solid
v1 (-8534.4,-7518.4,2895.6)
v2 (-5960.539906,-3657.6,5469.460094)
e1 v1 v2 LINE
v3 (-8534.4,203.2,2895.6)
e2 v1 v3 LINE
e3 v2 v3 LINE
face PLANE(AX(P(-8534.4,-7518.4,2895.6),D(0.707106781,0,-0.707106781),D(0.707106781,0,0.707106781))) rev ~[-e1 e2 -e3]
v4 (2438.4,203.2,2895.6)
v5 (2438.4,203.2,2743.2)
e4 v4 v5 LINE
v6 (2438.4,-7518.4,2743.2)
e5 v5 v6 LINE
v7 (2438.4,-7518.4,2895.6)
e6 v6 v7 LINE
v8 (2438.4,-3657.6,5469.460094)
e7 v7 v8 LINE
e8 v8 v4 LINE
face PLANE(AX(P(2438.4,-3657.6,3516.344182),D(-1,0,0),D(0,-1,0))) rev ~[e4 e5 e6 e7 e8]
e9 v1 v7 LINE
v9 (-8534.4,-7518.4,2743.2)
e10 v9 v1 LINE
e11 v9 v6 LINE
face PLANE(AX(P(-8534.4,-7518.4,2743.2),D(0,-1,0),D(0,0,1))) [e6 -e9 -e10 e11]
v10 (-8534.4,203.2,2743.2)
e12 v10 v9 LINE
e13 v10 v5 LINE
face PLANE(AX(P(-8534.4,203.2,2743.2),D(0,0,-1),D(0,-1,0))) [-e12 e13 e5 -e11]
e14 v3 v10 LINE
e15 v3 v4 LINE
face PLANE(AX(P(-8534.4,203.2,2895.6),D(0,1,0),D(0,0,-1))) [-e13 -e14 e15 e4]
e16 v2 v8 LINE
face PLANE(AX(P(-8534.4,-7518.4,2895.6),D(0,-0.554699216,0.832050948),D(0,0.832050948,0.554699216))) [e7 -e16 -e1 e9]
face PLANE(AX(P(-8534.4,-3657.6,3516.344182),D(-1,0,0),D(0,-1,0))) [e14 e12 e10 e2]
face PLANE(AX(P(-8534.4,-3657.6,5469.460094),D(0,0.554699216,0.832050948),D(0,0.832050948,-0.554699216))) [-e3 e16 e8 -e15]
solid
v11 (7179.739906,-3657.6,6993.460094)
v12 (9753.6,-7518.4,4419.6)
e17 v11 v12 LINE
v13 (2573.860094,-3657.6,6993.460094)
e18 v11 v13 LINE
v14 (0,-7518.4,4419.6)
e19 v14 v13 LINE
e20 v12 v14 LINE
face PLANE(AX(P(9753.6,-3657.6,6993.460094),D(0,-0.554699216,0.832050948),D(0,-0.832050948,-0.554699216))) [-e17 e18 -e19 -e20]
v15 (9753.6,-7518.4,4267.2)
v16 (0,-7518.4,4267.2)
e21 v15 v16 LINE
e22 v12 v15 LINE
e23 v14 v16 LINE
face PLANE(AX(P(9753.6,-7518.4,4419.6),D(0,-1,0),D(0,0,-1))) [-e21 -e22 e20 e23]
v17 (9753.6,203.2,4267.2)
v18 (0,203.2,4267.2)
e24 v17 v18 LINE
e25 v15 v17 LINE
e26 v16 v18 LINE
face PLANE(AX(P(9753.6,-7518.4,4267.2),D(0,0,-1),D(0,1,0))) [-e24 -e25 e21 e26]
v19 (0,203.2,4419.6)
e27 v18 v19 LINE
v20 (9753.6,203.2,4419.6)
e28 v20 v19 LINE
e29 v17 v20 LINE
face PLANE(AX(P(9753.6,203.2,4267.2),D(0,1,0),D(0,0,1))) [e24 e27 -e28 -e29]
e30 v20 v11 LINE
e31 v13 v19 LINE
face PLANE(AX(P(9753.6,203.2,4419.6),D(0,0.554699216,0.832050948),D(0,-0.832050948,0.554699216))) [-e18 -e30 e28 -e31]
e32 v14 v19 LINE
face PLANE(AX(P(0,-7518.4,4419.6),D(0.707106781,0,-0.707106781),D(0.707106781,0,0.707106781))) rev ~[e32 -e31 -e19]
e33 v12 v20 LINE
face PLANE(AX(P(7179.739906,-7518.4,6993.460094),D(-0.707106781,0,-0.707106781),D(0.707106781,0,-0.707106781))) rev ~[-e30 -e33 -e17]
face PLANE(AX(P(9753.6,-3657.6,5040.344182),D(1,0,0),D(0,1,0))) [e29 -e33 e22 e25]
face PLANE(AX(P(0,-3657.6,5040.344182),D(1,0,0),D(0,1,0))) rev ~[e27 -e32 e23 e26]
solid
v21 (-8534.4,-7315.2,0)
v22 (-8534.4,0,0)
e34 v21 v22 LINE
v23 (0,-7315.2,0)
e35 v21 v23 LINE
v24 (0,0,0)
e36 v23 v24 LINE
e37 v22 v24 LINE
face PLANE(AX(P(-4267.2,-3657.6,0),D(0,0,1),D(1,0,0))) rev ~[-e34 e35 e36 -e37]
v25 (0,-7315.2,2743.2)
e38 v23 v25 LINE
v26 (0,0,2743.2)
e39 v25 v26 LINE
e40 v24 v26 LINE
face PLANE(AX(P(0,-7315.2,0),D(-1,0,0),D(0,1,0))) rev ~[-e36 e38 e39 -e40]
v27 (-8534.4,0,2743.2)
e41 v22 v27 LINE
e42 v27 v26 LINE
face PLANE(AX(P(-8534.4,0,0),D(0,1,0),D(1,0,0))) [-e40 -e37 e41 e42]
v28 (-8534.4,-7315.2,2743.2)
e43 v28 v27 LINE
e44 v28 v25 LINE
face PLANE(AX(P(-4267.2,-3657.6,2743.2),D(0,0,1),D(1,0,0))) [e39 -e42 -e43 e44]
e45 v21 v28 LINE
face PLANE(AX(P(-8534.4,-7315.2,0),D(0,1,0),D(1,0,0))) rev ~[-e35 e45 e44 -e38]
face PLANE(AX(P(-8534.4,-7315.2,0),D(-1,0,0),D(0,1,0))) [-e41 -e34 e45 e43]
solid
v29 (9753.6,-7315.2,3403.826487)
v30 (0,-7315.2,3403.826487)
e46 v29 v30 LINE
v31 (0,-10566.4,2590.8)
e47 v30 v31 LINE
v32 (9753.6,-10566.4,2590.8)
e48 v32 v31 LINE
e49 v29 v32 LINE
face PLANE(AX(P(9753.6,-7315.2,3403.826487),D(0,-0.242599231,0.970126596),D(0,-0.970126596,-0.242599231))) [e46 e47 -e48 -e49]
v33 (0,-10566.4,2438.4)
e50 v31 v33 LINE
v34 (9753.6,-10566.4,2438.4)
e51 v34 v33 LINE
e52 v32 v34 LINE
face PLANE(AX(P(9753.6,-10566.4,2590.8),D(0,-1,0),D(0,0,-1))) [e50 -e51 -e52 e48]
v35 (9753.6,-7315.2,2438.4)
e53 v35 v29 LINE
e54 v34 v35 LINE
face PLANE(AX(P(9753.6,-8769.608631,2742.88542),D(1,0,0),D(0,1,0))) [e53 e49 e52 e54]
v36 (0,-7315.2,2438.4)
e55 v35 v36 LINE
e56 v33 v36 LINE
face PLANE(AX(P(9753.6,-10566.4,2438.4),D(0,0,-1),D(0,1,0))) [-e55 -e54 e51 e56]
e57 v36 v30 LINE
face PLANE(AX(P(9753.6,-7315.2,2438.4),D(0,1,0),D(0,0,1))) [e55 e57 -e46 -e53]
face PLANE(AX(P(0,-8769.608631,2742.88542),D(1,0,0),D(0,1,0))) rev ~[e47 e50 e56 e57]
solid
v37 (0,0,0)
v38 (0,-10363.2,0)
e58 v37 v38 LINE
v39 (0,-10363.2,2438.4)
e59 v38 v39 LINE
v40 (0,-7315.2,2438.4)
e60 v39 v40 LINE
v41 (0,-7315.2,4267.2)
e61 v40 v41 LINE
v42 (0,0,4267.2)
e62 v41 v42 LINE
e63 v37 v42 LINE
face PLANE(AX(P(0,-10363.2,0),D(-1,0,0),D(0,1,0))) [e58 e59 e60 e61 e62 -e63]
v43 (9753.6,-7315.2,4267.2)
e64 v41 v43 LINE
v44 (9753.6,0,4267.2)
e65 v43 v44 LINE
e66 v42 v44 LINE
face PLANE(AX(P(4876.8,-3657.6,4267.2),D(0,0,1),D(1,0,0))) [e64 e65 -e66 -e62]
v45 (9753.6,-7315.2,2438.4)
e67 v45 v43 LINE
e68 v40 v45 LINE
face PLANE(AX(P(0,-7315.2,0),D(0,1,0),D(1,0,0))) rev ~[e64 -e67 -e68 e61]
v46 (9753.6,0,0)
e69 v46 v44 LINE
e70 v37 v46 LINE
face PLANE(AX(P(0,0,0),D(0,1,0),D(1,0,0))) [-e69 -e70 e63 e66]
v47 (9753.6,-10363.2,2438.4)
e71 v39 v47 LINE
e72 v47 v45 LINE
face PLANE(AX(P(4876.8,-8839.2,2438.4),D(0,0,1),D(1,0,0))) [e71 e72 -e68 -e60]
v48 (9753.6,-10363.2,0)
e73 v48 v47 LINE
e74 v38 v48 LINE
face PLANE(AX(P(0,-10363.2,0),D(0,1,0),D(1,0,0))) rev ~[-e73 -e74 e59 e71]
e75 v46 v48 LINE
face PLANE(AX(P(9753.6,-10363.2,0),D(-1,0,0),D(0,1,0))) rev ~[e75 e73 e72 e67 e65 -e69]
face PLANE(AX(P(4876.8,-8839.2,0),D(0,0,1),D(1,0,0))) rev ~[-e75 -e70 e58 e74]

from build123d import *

# Parameters (mm, degrees)
F0_W      = 9753.6
F0_H      = 7315.2
F1_DEPTH  = 4267.2
F3_DEPTH  = 9753.6
F4_W      = 9753.6
F4_H      = 3048
F5_DEPTH  = 2438.4
F7_DEPTH  = 9753.6
F8_W      = 8534.4
F8_H      = 7315.2
F9_DEPTH  = 2743.2
F11_DEPTH = 10972.8
F13_DEPTH = 7721.601
F15_DEPTH = 7721.601


# Not quite as in the source:
# - a feature names something its author has since deleted; it is built from what else it names


with BuildPart() as f1:
    # F0 (on Top) → F1 (new body)
    with BuildSketch(Plane.XY):
        with Locations((4876.8, -3657.6)):
            Rectangle(F0_W, F0_H)
    extrude(amount=F1_DEPTH)

    # F4 (on Top) → F5 (join)
    with BuildSketch(Plane.XY):
        with Locations((4876.8, -8839.2)):
            Rectangle(F4_W, F4_H)
    extrude(amount=F5_DEPTH)


with BuildPart() as f3:
    # F2 (on face) → F3 (new body)
    with BuildSketch(Plane.YZ.offset(9753.6)):
        Polygon((-7518.4, 4419.6), (-7518.4, 4267.2), (-7315.2, 4267.2), (0, 4267.2), (203.2, 4267.2), (203.2, 4419.6), (-3657.6, 6993.4600942352), align=None)
    extrude(amount=-F3_DEPTH)

    # F14 (on face) → F15 (cut, through all)
    with BuildSketch(Plane.XZ.offset(7518.4)):
        Polygon((0, 4419.6), (2573.8600942352, 6993.4600942352), (0, 6993.4600942352), align=None)
        Polygon((7179.7399057648, 6993.4600942352), (9753.6, 4419.6), (9753.6, 6993.4600942352), align=None)
    extrude(amount=-F15_DEPTH, mode=Mode.SUBTRACT)


with BuildPart() as f7:
    # F6 (on face) → F7 (new body, through all)
    with BuildSketch(Plane.YZ.offset(9753.6)):
        Polygon((-10566.4, 2590.8), (-10566.4, 2438.4), (-10363.2, 2438.4), (-7315.2, 2438.4), (-7315.2, 3403.826487487), align=None)
    extrude(amount=-F7_DEPTH)


with BuildPart() as f9:
    # F8 (on Top) → F9 (new body)
    with BuildSketch(Plane.XY):
        with Locations((-4267.2, -3657.6)):
            Rectangle(F8_W, F8_H)
    extrude(amount=F9_DEPTH)


with BuildPart() as f11:
    # F10 (on face) → F11 (new body)
    with BuildSketch(Plane(origin=(-8534.4, 0, 0), x_dir=(0, -1, 0), z_dir=(-1, 0, 0))):
        Polygon((7518.4, 2895.6), (3657.6, 5469.4600942352), (-203.2, 2895.6), (-203.2, 2743.2), (0, 2743.2), (7315.2, 2743.2), (7518.4, 2743.2), align=None)
    extrude(amount=-F11_DEPTH)

    # F12 (on face) → F13 (cut, through all)
    with BuildSketch(Plane.XZ.offset(7518.4)):
        Polygon((-5960.5399057648, 5469.4600942352), (-8534.4, 5469.4600942352), (-8534.4, 2895.6), align=None)
    extrude(amount=-F13_DEPTH, mode=Mode.SUBTRACT)


solid = Compound([f1.part, f3.part, f7.part, f9.part, f11.part])
